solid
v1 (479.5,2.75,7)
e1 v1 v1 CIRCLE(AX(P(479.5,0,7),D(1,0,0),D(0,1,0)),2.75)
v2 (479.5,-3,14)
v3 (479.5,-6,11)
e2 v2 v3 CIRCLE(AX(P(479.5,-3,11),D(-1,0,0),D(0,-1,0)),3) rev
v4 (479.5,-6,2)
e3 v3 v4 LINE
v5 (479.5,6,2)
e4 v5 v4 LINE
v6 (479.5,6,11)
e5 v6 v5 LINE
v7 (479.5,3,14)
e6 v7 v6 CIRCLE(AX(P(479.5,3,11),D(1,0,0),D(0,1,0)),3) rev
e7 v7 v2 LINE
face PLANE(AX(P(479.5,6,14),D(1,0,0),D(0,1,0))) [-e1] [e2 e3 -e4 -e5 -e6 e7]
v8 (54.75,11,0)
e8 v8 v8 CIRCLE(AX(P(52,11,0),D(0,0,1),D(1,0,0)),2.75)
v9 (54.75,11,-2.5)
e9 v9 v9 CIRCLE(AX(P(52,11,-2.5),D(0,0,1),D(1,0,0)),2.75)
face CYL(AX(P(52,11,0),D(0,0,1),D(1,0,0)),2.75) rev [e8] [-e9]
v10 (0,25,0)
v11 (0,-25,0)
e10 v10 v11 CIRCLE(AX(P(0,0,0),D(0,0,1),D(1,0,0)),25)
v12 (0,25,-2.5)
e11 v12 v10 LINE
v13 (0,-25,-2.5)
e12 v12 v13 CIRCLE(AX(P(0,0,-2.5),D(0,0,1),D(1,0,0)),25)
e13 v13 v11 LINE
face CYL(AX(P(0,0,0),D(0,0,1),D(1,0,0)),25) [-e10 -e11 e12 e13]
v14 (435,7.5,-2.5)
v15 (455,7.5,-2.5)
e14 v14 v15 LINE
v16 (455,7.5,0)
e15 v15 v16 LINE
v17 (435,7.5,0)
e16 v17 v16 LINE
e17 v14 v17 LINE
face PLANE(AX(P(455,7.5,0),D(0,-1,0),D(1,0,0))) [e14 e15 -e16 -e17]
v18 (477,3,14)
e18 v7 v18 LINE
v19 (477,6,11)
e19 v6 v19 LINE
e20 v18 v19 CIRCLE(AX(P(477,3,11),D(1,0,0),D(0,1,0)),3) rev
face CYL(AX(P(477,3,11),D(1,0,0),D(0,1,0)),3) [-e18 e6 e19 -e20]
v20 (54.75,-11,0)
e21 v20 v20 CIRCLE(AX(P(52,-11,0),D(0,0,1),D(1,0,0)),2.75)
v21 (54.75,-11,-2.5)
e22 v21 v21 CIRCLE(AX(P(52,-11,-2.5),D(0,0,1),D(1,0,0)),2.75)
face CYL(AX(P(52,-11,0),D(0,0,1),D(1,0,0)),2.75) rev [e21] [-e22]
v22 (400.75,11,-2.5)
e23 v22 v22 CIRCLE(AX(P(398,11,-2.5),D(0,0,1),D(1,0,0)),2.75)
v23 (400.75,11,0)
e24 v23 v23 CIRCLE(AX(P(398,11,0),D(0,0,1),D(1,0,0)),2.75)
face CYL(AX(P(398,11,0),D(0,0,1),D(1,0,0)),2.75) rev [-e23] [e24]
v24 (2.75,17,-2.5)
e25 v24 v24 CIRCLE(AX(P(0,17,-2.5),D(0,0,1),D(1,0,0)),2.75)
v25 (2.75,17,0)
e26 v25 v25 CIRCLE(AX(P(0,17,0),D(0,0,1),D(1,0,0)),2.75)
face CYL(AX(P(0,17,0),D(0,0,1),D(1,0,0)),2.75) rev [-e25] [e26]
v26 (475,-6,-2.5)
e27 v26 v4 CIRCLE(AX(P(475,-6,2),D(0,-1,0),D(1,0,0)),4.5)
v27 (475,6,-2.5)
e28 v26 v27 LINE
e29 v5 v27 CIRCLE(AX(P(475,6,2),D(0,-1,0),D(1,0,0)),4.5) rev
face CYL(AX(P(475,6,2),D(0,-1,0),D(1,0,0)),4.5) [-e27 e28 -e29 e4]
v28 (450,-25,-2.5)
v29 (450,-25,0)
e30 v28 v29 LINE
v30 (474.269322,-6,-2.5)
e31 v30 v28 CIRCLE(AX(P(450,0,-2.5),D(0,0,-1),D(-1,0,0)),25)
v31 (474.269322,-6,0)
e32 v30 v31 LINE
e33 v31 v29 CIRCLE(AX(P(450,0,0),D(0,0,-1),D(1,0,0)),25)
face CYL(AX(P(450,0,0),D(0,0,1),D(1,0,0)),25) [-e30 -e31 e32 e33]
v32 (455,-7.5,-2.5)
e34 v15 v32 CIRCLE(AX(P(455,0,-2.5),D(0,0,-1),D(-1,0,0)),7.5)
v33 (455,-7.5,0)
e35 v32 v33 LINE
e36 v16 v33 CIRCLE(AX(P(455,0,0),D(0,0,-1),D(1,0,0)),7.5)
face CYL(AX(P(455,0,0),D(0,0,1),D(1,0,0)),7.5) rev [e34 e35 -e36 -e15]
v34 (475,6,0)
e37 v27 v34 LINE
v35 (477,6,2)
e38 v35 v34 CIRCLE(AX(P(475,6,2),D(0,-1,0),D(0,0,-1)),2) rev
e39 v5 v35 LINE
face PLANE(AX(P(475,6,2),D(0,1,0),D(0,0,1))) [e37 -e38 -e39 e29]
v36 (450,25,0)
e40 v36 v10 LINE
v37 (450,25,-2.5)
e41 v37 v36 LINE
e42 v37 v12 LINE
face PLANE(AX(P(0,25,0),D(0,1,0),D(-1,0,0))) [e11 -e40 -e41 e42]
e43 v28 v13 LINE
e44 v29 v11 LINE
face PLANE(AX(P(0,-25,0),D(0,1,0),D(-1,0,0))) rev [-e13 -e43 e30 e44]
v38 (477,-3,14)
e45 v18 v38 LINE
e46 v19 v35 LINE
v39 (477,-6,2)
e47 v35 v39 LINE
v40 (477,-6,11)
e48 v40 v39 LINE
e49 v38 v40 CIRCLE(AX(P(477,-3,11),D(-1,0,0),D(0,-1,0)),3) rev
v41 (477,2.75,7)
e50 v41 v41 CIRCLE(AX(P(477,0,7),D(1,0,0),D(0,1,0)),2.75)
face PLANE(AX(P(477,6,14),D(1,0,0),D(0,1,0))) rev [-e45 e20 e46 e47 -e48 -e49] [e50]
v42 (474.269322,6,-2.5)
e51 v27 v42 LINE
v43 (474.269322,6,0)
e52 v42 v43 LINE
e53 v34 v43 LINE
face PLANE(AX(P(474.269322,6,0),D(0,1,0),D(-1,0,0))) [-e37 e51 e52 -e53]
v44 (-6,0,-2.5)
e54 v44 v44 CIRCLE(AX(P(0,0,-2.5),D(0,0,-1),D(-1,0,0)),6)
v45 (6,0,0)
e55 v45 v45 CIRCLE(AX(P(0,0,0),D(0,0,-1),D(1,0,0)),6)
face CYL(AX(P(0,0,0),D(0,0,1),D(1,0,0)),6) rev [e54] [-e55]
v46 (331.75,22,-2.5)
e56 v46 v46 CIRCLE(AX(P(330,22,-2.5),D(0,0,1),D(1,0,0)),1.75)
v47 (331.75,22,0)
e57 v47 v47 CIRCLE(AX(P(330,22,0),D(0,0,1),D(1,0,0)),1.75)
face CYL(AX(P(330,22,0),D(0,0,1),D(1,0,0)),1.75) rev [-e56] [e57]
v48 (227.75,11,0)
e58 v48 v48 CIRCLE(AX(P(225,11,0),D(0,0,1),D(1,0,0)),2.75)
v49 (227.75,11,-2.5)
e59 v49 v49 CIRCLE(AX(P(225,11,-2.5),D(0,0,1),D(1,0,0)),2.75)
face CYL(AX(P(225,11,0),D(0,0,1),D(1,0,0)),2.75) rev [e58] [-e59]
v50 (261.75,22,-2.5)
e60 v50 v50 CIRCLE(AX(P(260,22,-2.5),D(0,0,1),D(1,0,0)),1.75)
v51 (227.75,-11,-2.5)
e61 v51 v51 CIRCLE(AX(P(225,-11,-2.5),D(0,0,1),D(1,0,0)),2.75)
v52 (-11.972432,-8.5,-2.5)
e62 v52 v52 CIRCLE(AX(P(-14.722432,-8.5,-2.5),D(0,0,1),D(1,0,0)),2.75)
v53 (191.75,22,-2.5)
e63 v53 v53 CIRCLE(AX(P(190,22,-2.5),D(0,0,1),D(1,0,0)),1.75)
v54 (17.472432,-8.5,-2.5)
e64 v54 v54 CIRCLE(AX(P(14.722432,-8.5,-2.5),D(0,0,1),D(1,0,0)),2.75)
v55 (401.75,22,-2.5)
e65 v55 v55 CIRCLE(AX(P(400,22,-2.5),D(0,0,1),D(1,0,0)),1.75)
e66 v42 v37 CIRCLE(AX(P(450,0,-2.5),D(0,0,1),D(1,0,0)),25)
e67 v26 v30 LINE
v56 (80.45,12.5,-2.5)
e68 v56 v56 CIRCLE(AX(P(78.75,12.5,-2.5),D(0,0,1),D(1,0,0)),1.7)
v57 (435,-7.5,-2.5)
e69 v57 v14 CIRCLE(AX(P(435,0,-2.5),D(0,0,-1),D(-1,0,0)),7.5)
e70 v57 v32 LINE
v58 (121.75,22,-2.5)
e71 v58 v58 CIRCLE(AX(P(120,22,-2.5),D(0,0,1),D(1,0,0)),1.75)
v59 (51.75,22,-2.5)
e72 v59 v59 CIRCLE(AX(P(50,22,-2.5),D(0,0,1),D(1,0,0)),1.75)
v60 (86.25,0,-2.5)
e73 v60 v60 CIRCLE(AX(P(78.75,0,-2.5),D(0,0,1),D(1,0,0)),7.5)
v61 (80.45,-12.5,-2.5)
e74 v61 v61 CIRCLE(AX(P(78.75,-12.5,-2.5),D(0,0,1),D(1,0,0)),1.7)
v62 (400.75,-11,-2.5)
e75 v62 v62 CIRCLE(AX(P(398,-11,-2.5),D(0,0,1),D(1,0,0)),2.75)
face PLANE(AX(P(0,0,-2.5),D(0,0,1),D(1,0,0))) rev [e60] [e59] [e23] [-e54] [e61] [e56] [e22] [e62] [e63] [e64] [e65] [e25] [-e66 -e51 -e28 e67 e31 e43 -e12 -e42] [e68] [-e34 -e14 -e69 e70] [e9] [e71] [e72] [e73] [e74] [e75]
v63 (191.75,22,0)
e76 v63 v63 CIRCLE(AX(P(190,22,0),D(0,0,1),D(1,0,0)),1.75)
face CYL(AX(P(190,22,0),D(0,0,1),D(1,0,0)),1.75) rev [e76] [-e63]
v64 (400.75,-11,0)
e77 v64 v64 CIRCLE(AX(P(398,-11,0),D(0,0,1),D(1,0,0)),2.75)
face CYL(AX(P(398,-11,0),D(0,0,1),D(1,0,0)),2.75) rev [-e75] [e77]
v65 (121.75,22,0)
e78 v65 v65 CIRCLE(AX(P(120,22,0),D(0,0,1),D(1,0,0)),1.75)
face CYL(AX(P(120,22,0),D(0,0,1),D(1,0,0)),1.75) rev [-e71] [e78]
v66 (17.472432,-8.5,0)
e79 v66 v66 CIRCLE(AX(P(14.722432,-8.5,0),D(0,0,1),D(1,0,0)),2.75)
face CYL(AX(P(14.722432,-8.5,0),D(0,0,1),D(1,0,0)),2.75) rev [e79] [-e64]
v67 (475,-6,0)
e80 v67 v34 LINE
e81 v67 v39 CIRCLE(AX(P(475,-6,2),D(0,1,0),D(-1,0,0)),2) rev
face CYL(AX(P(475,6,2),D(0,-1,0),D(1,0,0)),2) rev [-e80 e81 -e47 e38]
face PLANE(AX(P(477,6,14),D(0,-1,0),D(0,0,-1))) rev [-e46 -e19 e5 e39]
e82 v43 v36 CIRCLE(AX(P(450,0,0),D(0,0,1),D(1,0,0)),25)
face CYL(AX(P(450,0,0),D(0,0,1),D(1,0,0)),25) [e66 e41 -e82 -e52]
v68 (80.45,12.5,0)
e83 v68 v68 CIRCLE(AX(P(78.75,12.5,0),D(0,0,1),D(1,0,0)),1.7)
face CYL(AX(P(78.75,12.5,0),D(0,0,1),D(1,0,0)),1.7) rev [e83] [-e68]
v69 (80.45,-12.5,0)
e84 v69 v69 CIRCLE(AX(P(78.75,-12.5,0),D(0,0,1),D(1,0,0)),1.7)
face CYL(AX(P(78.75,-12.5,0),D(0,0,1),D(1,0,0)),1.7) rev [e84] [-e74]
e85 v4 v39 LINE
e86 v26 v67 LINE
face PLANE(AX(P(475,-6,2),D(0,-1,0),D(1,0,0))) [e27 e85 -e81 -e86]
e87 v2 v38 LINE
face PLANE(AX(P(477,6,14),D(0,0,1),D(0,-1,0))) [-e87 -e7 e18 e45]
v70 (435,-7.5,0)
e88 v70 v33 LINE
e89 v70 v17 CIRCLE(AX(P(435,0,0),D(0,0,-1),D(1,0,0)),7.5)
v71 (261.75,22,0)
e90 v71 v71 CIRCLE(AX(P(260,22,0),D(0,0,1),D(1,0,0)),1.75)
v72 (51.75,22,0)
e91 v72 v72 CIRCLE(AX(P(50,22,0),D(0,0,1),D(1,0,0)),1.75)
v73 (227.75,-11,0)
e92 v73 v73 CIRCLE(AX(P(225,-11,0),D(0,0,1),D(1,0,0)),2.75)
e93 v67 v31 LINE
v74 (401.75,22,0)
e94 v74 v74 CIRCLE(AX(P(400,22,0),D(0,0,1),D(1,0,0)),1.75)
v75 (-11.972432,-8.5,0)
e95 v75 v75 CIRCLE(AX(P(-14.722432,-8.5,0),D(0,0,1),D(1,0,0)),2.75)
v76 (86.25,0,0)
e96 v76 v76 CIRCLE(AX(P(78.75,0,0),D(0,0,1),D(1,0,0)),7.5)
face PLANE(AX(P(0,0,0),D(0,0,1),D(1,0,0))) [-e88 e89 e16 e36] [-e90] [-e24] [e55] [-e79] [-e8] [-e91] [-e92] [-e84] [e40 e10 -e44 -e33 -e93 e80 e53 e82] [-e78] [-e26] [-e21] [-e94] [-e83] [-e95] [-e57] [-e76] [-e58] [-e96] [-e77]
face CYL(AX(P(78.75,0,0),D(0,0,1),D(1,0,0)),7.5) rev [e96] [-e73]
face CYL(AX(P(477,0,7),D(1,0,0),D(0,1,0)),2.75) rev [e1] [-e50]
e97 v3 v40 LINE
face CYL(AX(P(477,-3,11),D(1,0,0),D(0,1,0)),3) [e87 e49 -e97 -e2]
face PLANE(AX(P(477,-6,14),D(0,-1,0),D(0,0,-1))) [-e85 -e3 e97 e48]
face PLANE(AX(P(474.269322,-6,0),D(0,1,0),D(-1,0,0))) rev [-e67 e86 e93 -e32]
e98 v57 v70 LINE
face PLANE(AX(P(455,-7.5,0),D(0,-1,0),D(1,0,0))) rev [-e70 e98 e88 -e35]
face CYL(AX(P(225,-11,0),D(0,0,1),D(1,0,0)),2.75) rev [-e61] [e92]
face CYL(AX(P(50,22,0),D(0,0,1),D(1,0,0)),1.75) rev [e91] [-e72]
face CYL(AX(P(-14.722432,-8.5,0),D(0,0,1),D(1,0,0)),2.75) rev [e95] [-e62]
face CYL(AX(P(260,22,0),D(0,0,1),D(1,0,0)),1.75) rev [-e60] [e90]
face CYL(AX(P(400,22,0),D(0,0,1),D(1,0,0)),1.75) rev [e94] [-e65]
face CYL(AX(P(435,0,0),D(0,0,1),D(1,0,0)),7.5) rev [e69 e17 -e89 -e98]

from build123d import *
from build123d.topology import SkipClean

# Parameters (mm, degrees)
AUFSATZ_LINEAR_AUSTRAGEN1_DEPTH        = 2.5
SKIZZE7_W                              = 2.5
SKIZZE7_H                              = 6
AUFSATZ_LINEAR_AUSTRAGEN2_DEPTH        = 14
VERRUNDUNG2_R                          = 3
F_5_5_5_5_DURCHMESSER_BOHRUNG1_D       = 5.5
KREISMUSTER1_COUNT                     = 3
DURCHGANGSLOCH_F_R_M51_D               = 5.5
DURCHGANGSLOCH_F_R_M51_DEPTH           = 9.5
DURCHGANGSLOCH_F_R_M51_TIP             = 1.652366702
F_3_5_3_5_DURCHMESSER_BOHRUNG1_D       = 3.5
DURCHGANGSLOCH_F_R_M52_D               = 5.5
SPIEGELN2_AT_THE_SECOND_PLANE_COPY_1_D = 5.5
SCHNITT_LINEAR_AUSTRAGEN1_REACH        = 482.355
SKIZZE19_R                             = 7.5
VOLUMENK_RPER_START                    = -6
VOLUMENK_RPER_UMWANDELN1_DEPTH         = 12
VOLUMENK_RPER_UMWANDELN1_2_DEPTH       = 12


# Read off the part's stored shape, not the designer's step: Volumenkörper umwandeln1
with BuildPart() as part:
    # Skizze1 → Aufsatz-Linear austragen1 (new body)
    with BuildSketch(Plane.XY):
        with BuildLine():
            Line((-6, 0), (-25, 0))
            ThreePointArc((-25, 0), (-17.67766953, 17.67766953), (0, 25))
            Line((0, 25), (450, 25))
            ThreePointArc((450, 25), (465.411035007, 19.685019685), (474.269322199, 6))
            Line((474.269322199, 6), (479.5, 6))
            Line((479.5, 6), (479.5, 0))
            Line((479.5, 0), (477, 0))
            Line((477, 0), (475, 0))
            Line((475, 0), (462.5, 0))
            ThreePointArc((462.5, 0), (460.303300859, 5.303300859), (455, 7.5))
            Line((455, 7.5), (450, 7.5))
            Line((450, 7.5), (435, 7.5))
            ThreePointArc((435, 7.5), (429.696699141, 5.303300859), (427.5, 0))
            Line((427.5, 0), (6, 0))
            ThreePointArc((6, 0), (0, 6), (-6, 0))
        make_face()
    extrude(amount=-AUFSATZ_LINEAR_AUSTRAGEN1_DEPTH)

    # Skizze7 → Aufsatz-Linear austragen2 (add)
    with BuildSketch(Plane.XY):
        with Locations((478.25, 3)):
            Rectangle(SKIZZE7_W, SKIZZE7_H)
    extrude(amount=AUFSATZ_LINEAR_AUSTRAGEN2_DEPTH)

    # Verrundung2
    verrundung2_edges = [part.edges().sort_by_distance(p)[0] for p in [
        (478.25, 6, 14),
    ]]
    fillet(verrundung2_edges, radius=VERRUNDUNG2_R)

    # Spiegeln1: part across plane


with BuildPart() as part_1:
    with SkipClean():  # the faces are left unmerged after this step: merging them gives an invalid solid
        add(part.part)
        add(part.part.mirror(Plane(origin=(6, 0, -2.5), x_dir=(0, 0, 1), z_dir=(0, -1, 0))))

    # Ø5.5 (5.5) Durchmesser Bohrung1 (through all)
    with Locations(Plane.XY):
        with Locations((0, 17)):
            f_5_5_5_5_durchmesser_bohrung1 = Hole(F_5_5_5_5_DURCHMESSER_BOHRUNG1_D / 2)

    # Kreismuster1: Ø5.5 (5.5) Durchmesser Bohrung1 ×3 about axis
    with SkipClean():  # the faces are left unmerged after this step: merging them gives an invalid solid
        kreismuster1_axis = Axis((0, 0, 0), (0, 0, 1))
        for i in range(1, KREISMUSTER1_COUNT):
            add(f_5_5_5_5_durchmesser_bohrung1.rotate(kreismuster1_axis, i * 360 / KREISMUSTER1_COUNT), mode=Mode.SUBTRACT)

    # Durchgangsloch für M51
    with Locations(Plane(origin=(479.5, 0, 0), x_dir=(0, 0, -1), z_dir=(1, 0, 0))):
        with Locations((-7, 0)):
            Hole(DURCHGANGSLOCH_F_R_M51_D / 2, depth=DURCHGANGSLOCH_F_R_M51_DEPTH)
            with Locations((0, 0, -(DURCHGANGSLOCH_F_R_M51_DEPTH + DURCHGANGSLOCH_F_R_M51_TIP / 2))):  # 118° drill point
                Cone(0, DURCHGANGSLOCH_F_R_M51_D / 2, DURCHGANGSLOCH_F_R_M51_TIP, mode=Mode.SUBTRACT)

    # Ø3.5 (3.5) Durchmesser Bohrung1 (through all)
    with Locations(Plane.XY):
        with Locations((400, 22), (330, 22), (260, 22), (190, 22), (120, 22), (50, 22)):
            Hole(F_3_5_3_5_DURCHMESSER_BOHRUNG1_D / 2)

    # Durchgangsloch für M52 (through all)
    with Locations(Plane.XY):
        with Locations((52, 11), (225, 11)):
            durchgangsloch_f_r_m52 = Hole(DURCHGANGSLOCH_F_R_M52_D / 2)

    # Spiegeln2: Durchgangsloch für M52 across plane
    with SkipClean():  # the faces are left unmerged after this step: merging them gives an invalid solid
        add(durchgangsloch_f_r_m52.mirror(Plane(origin=(225, 0, 0), x_dir=(0, 0, 1), z_dir=(1, 0, 0))), mode=Mode.SUBTRACT)

    # Spiegeln2 at the second plane: Durchgangsloch für M52 across plane
    with SkipClean():  # the faces are left unmerged after this step: merging them gives an invalid solid
        add(durchgangsloch_f_r_m52.mirror(Plane.ZX), mode=Mode.SUBTRACT)

    # Spiegeln2 at the second plane copy 1 (through all)
    with Locations(Plane(origin=(450, 0, 0), x_dir=(-1, 0, 0), z_dir=(0, 0, 1))):
        with Locations((52, 11), (225, 11)):
            Hole(SPIEGELN2_AT_THE_SECOND_PLANE_COPY_1_D / 2)

    # Skizze19 → Schnitt-Linear austragen1 (cut, up to next)
    with BuildSketch(Plane.XY, mode=Mode.PRIVATE) as schnitt_linear_austragen1_sk1:
        with Locations((78.75, 0)):
            Circle(SKIZZE19_R)
    schnitt_linear_austragen1_tool1 = extrude(schnitt_linear_austragen1_sk1.sketch, amount=-SCHNITT_LINEAR_AUSTRAGEN1_REACH, mode=Mode.PRIVATE) & part_1.part
    add(schnitt_linear_austragen1_tool1.solids().sort_by_distance((78.75, 0, 0))[0], mode=Mode.SUBTRACT)

    # Skizze22 → Durchgangsloch für M31 (revolve, cut)
    with SkipClean():  # the faces are left unmerged after this step: merging them gives an invalid solid
        with BuildSketch(Plane(origin=(78.75, 12.5, 0), x_dir=(0, -1, 0), z_dir=(1, 0, 0))):
            Polygon((0, 0), (0, 3.771463052), (1.7, 2.75), (1.7, 0), align=None)
        durchgangsloch_f_r_m31 = revolve(axis=Axis((78.75, 12.5, 6.35), (0, 0, -1)), mode=Mode.SUBTRACT)

    # Spiegeln3: Durchgangsloch für M31 across plane
    with SkipClean():  # the faces are left unmerged after this step: merging them gives an invalid solid
        add(durchgangsloch_f_r_m31.mirror(Plane.ZX), mode=Mode.SUBTRACT)

    # Volumenkörper umwandeln1 outline → Volumenkörper umwandeln1 (cut)
    with SkipClean():  # the faces are left unmerged after this step: merging them gives an invalid solid
        with BuildSketch(Plane(origin=(0, 0, 0), x_dir=(1, 0, 0), z_dir=(0, 1, 0)).offset(VOLUMENK_RPER_START)):
            with BuildLine():
                Line((479.5, 2.5), (475, 2.5))
                ThreePointArc((475, 2.5), (478.181980515, 1.181980515), (479.5, -2))
                Line((479.5, -2), (479.5, 2.5))
            make_face()
        extrude(amount=VOLUMENK_RPER_UMWANDELN1_DEPTH, mode=Mode.SUBTRACT)

    # Volumenk_rper umwandeln1 2 outline → Volumenk_rper umwandeln1 2 (add)
    with BuildSketch(Plane(origin=(0, 0, 0), x_dir=(1, 0, 0), z_dir=(0, 1, 0)).offset(VOLUMENK_RPER_START)):
        with BuildLine():
            Line((477, 0), (475, 0))
            ThreePointArc((475, 0), (476.414213562, -0.585786438), (477, -2))
            Line((477, -2), (477, 0))
        make_face()
    extrude(amount=VOLUMENK_RPER_UMWANDELN1_2_DEPTH)


solid = part_1.part
